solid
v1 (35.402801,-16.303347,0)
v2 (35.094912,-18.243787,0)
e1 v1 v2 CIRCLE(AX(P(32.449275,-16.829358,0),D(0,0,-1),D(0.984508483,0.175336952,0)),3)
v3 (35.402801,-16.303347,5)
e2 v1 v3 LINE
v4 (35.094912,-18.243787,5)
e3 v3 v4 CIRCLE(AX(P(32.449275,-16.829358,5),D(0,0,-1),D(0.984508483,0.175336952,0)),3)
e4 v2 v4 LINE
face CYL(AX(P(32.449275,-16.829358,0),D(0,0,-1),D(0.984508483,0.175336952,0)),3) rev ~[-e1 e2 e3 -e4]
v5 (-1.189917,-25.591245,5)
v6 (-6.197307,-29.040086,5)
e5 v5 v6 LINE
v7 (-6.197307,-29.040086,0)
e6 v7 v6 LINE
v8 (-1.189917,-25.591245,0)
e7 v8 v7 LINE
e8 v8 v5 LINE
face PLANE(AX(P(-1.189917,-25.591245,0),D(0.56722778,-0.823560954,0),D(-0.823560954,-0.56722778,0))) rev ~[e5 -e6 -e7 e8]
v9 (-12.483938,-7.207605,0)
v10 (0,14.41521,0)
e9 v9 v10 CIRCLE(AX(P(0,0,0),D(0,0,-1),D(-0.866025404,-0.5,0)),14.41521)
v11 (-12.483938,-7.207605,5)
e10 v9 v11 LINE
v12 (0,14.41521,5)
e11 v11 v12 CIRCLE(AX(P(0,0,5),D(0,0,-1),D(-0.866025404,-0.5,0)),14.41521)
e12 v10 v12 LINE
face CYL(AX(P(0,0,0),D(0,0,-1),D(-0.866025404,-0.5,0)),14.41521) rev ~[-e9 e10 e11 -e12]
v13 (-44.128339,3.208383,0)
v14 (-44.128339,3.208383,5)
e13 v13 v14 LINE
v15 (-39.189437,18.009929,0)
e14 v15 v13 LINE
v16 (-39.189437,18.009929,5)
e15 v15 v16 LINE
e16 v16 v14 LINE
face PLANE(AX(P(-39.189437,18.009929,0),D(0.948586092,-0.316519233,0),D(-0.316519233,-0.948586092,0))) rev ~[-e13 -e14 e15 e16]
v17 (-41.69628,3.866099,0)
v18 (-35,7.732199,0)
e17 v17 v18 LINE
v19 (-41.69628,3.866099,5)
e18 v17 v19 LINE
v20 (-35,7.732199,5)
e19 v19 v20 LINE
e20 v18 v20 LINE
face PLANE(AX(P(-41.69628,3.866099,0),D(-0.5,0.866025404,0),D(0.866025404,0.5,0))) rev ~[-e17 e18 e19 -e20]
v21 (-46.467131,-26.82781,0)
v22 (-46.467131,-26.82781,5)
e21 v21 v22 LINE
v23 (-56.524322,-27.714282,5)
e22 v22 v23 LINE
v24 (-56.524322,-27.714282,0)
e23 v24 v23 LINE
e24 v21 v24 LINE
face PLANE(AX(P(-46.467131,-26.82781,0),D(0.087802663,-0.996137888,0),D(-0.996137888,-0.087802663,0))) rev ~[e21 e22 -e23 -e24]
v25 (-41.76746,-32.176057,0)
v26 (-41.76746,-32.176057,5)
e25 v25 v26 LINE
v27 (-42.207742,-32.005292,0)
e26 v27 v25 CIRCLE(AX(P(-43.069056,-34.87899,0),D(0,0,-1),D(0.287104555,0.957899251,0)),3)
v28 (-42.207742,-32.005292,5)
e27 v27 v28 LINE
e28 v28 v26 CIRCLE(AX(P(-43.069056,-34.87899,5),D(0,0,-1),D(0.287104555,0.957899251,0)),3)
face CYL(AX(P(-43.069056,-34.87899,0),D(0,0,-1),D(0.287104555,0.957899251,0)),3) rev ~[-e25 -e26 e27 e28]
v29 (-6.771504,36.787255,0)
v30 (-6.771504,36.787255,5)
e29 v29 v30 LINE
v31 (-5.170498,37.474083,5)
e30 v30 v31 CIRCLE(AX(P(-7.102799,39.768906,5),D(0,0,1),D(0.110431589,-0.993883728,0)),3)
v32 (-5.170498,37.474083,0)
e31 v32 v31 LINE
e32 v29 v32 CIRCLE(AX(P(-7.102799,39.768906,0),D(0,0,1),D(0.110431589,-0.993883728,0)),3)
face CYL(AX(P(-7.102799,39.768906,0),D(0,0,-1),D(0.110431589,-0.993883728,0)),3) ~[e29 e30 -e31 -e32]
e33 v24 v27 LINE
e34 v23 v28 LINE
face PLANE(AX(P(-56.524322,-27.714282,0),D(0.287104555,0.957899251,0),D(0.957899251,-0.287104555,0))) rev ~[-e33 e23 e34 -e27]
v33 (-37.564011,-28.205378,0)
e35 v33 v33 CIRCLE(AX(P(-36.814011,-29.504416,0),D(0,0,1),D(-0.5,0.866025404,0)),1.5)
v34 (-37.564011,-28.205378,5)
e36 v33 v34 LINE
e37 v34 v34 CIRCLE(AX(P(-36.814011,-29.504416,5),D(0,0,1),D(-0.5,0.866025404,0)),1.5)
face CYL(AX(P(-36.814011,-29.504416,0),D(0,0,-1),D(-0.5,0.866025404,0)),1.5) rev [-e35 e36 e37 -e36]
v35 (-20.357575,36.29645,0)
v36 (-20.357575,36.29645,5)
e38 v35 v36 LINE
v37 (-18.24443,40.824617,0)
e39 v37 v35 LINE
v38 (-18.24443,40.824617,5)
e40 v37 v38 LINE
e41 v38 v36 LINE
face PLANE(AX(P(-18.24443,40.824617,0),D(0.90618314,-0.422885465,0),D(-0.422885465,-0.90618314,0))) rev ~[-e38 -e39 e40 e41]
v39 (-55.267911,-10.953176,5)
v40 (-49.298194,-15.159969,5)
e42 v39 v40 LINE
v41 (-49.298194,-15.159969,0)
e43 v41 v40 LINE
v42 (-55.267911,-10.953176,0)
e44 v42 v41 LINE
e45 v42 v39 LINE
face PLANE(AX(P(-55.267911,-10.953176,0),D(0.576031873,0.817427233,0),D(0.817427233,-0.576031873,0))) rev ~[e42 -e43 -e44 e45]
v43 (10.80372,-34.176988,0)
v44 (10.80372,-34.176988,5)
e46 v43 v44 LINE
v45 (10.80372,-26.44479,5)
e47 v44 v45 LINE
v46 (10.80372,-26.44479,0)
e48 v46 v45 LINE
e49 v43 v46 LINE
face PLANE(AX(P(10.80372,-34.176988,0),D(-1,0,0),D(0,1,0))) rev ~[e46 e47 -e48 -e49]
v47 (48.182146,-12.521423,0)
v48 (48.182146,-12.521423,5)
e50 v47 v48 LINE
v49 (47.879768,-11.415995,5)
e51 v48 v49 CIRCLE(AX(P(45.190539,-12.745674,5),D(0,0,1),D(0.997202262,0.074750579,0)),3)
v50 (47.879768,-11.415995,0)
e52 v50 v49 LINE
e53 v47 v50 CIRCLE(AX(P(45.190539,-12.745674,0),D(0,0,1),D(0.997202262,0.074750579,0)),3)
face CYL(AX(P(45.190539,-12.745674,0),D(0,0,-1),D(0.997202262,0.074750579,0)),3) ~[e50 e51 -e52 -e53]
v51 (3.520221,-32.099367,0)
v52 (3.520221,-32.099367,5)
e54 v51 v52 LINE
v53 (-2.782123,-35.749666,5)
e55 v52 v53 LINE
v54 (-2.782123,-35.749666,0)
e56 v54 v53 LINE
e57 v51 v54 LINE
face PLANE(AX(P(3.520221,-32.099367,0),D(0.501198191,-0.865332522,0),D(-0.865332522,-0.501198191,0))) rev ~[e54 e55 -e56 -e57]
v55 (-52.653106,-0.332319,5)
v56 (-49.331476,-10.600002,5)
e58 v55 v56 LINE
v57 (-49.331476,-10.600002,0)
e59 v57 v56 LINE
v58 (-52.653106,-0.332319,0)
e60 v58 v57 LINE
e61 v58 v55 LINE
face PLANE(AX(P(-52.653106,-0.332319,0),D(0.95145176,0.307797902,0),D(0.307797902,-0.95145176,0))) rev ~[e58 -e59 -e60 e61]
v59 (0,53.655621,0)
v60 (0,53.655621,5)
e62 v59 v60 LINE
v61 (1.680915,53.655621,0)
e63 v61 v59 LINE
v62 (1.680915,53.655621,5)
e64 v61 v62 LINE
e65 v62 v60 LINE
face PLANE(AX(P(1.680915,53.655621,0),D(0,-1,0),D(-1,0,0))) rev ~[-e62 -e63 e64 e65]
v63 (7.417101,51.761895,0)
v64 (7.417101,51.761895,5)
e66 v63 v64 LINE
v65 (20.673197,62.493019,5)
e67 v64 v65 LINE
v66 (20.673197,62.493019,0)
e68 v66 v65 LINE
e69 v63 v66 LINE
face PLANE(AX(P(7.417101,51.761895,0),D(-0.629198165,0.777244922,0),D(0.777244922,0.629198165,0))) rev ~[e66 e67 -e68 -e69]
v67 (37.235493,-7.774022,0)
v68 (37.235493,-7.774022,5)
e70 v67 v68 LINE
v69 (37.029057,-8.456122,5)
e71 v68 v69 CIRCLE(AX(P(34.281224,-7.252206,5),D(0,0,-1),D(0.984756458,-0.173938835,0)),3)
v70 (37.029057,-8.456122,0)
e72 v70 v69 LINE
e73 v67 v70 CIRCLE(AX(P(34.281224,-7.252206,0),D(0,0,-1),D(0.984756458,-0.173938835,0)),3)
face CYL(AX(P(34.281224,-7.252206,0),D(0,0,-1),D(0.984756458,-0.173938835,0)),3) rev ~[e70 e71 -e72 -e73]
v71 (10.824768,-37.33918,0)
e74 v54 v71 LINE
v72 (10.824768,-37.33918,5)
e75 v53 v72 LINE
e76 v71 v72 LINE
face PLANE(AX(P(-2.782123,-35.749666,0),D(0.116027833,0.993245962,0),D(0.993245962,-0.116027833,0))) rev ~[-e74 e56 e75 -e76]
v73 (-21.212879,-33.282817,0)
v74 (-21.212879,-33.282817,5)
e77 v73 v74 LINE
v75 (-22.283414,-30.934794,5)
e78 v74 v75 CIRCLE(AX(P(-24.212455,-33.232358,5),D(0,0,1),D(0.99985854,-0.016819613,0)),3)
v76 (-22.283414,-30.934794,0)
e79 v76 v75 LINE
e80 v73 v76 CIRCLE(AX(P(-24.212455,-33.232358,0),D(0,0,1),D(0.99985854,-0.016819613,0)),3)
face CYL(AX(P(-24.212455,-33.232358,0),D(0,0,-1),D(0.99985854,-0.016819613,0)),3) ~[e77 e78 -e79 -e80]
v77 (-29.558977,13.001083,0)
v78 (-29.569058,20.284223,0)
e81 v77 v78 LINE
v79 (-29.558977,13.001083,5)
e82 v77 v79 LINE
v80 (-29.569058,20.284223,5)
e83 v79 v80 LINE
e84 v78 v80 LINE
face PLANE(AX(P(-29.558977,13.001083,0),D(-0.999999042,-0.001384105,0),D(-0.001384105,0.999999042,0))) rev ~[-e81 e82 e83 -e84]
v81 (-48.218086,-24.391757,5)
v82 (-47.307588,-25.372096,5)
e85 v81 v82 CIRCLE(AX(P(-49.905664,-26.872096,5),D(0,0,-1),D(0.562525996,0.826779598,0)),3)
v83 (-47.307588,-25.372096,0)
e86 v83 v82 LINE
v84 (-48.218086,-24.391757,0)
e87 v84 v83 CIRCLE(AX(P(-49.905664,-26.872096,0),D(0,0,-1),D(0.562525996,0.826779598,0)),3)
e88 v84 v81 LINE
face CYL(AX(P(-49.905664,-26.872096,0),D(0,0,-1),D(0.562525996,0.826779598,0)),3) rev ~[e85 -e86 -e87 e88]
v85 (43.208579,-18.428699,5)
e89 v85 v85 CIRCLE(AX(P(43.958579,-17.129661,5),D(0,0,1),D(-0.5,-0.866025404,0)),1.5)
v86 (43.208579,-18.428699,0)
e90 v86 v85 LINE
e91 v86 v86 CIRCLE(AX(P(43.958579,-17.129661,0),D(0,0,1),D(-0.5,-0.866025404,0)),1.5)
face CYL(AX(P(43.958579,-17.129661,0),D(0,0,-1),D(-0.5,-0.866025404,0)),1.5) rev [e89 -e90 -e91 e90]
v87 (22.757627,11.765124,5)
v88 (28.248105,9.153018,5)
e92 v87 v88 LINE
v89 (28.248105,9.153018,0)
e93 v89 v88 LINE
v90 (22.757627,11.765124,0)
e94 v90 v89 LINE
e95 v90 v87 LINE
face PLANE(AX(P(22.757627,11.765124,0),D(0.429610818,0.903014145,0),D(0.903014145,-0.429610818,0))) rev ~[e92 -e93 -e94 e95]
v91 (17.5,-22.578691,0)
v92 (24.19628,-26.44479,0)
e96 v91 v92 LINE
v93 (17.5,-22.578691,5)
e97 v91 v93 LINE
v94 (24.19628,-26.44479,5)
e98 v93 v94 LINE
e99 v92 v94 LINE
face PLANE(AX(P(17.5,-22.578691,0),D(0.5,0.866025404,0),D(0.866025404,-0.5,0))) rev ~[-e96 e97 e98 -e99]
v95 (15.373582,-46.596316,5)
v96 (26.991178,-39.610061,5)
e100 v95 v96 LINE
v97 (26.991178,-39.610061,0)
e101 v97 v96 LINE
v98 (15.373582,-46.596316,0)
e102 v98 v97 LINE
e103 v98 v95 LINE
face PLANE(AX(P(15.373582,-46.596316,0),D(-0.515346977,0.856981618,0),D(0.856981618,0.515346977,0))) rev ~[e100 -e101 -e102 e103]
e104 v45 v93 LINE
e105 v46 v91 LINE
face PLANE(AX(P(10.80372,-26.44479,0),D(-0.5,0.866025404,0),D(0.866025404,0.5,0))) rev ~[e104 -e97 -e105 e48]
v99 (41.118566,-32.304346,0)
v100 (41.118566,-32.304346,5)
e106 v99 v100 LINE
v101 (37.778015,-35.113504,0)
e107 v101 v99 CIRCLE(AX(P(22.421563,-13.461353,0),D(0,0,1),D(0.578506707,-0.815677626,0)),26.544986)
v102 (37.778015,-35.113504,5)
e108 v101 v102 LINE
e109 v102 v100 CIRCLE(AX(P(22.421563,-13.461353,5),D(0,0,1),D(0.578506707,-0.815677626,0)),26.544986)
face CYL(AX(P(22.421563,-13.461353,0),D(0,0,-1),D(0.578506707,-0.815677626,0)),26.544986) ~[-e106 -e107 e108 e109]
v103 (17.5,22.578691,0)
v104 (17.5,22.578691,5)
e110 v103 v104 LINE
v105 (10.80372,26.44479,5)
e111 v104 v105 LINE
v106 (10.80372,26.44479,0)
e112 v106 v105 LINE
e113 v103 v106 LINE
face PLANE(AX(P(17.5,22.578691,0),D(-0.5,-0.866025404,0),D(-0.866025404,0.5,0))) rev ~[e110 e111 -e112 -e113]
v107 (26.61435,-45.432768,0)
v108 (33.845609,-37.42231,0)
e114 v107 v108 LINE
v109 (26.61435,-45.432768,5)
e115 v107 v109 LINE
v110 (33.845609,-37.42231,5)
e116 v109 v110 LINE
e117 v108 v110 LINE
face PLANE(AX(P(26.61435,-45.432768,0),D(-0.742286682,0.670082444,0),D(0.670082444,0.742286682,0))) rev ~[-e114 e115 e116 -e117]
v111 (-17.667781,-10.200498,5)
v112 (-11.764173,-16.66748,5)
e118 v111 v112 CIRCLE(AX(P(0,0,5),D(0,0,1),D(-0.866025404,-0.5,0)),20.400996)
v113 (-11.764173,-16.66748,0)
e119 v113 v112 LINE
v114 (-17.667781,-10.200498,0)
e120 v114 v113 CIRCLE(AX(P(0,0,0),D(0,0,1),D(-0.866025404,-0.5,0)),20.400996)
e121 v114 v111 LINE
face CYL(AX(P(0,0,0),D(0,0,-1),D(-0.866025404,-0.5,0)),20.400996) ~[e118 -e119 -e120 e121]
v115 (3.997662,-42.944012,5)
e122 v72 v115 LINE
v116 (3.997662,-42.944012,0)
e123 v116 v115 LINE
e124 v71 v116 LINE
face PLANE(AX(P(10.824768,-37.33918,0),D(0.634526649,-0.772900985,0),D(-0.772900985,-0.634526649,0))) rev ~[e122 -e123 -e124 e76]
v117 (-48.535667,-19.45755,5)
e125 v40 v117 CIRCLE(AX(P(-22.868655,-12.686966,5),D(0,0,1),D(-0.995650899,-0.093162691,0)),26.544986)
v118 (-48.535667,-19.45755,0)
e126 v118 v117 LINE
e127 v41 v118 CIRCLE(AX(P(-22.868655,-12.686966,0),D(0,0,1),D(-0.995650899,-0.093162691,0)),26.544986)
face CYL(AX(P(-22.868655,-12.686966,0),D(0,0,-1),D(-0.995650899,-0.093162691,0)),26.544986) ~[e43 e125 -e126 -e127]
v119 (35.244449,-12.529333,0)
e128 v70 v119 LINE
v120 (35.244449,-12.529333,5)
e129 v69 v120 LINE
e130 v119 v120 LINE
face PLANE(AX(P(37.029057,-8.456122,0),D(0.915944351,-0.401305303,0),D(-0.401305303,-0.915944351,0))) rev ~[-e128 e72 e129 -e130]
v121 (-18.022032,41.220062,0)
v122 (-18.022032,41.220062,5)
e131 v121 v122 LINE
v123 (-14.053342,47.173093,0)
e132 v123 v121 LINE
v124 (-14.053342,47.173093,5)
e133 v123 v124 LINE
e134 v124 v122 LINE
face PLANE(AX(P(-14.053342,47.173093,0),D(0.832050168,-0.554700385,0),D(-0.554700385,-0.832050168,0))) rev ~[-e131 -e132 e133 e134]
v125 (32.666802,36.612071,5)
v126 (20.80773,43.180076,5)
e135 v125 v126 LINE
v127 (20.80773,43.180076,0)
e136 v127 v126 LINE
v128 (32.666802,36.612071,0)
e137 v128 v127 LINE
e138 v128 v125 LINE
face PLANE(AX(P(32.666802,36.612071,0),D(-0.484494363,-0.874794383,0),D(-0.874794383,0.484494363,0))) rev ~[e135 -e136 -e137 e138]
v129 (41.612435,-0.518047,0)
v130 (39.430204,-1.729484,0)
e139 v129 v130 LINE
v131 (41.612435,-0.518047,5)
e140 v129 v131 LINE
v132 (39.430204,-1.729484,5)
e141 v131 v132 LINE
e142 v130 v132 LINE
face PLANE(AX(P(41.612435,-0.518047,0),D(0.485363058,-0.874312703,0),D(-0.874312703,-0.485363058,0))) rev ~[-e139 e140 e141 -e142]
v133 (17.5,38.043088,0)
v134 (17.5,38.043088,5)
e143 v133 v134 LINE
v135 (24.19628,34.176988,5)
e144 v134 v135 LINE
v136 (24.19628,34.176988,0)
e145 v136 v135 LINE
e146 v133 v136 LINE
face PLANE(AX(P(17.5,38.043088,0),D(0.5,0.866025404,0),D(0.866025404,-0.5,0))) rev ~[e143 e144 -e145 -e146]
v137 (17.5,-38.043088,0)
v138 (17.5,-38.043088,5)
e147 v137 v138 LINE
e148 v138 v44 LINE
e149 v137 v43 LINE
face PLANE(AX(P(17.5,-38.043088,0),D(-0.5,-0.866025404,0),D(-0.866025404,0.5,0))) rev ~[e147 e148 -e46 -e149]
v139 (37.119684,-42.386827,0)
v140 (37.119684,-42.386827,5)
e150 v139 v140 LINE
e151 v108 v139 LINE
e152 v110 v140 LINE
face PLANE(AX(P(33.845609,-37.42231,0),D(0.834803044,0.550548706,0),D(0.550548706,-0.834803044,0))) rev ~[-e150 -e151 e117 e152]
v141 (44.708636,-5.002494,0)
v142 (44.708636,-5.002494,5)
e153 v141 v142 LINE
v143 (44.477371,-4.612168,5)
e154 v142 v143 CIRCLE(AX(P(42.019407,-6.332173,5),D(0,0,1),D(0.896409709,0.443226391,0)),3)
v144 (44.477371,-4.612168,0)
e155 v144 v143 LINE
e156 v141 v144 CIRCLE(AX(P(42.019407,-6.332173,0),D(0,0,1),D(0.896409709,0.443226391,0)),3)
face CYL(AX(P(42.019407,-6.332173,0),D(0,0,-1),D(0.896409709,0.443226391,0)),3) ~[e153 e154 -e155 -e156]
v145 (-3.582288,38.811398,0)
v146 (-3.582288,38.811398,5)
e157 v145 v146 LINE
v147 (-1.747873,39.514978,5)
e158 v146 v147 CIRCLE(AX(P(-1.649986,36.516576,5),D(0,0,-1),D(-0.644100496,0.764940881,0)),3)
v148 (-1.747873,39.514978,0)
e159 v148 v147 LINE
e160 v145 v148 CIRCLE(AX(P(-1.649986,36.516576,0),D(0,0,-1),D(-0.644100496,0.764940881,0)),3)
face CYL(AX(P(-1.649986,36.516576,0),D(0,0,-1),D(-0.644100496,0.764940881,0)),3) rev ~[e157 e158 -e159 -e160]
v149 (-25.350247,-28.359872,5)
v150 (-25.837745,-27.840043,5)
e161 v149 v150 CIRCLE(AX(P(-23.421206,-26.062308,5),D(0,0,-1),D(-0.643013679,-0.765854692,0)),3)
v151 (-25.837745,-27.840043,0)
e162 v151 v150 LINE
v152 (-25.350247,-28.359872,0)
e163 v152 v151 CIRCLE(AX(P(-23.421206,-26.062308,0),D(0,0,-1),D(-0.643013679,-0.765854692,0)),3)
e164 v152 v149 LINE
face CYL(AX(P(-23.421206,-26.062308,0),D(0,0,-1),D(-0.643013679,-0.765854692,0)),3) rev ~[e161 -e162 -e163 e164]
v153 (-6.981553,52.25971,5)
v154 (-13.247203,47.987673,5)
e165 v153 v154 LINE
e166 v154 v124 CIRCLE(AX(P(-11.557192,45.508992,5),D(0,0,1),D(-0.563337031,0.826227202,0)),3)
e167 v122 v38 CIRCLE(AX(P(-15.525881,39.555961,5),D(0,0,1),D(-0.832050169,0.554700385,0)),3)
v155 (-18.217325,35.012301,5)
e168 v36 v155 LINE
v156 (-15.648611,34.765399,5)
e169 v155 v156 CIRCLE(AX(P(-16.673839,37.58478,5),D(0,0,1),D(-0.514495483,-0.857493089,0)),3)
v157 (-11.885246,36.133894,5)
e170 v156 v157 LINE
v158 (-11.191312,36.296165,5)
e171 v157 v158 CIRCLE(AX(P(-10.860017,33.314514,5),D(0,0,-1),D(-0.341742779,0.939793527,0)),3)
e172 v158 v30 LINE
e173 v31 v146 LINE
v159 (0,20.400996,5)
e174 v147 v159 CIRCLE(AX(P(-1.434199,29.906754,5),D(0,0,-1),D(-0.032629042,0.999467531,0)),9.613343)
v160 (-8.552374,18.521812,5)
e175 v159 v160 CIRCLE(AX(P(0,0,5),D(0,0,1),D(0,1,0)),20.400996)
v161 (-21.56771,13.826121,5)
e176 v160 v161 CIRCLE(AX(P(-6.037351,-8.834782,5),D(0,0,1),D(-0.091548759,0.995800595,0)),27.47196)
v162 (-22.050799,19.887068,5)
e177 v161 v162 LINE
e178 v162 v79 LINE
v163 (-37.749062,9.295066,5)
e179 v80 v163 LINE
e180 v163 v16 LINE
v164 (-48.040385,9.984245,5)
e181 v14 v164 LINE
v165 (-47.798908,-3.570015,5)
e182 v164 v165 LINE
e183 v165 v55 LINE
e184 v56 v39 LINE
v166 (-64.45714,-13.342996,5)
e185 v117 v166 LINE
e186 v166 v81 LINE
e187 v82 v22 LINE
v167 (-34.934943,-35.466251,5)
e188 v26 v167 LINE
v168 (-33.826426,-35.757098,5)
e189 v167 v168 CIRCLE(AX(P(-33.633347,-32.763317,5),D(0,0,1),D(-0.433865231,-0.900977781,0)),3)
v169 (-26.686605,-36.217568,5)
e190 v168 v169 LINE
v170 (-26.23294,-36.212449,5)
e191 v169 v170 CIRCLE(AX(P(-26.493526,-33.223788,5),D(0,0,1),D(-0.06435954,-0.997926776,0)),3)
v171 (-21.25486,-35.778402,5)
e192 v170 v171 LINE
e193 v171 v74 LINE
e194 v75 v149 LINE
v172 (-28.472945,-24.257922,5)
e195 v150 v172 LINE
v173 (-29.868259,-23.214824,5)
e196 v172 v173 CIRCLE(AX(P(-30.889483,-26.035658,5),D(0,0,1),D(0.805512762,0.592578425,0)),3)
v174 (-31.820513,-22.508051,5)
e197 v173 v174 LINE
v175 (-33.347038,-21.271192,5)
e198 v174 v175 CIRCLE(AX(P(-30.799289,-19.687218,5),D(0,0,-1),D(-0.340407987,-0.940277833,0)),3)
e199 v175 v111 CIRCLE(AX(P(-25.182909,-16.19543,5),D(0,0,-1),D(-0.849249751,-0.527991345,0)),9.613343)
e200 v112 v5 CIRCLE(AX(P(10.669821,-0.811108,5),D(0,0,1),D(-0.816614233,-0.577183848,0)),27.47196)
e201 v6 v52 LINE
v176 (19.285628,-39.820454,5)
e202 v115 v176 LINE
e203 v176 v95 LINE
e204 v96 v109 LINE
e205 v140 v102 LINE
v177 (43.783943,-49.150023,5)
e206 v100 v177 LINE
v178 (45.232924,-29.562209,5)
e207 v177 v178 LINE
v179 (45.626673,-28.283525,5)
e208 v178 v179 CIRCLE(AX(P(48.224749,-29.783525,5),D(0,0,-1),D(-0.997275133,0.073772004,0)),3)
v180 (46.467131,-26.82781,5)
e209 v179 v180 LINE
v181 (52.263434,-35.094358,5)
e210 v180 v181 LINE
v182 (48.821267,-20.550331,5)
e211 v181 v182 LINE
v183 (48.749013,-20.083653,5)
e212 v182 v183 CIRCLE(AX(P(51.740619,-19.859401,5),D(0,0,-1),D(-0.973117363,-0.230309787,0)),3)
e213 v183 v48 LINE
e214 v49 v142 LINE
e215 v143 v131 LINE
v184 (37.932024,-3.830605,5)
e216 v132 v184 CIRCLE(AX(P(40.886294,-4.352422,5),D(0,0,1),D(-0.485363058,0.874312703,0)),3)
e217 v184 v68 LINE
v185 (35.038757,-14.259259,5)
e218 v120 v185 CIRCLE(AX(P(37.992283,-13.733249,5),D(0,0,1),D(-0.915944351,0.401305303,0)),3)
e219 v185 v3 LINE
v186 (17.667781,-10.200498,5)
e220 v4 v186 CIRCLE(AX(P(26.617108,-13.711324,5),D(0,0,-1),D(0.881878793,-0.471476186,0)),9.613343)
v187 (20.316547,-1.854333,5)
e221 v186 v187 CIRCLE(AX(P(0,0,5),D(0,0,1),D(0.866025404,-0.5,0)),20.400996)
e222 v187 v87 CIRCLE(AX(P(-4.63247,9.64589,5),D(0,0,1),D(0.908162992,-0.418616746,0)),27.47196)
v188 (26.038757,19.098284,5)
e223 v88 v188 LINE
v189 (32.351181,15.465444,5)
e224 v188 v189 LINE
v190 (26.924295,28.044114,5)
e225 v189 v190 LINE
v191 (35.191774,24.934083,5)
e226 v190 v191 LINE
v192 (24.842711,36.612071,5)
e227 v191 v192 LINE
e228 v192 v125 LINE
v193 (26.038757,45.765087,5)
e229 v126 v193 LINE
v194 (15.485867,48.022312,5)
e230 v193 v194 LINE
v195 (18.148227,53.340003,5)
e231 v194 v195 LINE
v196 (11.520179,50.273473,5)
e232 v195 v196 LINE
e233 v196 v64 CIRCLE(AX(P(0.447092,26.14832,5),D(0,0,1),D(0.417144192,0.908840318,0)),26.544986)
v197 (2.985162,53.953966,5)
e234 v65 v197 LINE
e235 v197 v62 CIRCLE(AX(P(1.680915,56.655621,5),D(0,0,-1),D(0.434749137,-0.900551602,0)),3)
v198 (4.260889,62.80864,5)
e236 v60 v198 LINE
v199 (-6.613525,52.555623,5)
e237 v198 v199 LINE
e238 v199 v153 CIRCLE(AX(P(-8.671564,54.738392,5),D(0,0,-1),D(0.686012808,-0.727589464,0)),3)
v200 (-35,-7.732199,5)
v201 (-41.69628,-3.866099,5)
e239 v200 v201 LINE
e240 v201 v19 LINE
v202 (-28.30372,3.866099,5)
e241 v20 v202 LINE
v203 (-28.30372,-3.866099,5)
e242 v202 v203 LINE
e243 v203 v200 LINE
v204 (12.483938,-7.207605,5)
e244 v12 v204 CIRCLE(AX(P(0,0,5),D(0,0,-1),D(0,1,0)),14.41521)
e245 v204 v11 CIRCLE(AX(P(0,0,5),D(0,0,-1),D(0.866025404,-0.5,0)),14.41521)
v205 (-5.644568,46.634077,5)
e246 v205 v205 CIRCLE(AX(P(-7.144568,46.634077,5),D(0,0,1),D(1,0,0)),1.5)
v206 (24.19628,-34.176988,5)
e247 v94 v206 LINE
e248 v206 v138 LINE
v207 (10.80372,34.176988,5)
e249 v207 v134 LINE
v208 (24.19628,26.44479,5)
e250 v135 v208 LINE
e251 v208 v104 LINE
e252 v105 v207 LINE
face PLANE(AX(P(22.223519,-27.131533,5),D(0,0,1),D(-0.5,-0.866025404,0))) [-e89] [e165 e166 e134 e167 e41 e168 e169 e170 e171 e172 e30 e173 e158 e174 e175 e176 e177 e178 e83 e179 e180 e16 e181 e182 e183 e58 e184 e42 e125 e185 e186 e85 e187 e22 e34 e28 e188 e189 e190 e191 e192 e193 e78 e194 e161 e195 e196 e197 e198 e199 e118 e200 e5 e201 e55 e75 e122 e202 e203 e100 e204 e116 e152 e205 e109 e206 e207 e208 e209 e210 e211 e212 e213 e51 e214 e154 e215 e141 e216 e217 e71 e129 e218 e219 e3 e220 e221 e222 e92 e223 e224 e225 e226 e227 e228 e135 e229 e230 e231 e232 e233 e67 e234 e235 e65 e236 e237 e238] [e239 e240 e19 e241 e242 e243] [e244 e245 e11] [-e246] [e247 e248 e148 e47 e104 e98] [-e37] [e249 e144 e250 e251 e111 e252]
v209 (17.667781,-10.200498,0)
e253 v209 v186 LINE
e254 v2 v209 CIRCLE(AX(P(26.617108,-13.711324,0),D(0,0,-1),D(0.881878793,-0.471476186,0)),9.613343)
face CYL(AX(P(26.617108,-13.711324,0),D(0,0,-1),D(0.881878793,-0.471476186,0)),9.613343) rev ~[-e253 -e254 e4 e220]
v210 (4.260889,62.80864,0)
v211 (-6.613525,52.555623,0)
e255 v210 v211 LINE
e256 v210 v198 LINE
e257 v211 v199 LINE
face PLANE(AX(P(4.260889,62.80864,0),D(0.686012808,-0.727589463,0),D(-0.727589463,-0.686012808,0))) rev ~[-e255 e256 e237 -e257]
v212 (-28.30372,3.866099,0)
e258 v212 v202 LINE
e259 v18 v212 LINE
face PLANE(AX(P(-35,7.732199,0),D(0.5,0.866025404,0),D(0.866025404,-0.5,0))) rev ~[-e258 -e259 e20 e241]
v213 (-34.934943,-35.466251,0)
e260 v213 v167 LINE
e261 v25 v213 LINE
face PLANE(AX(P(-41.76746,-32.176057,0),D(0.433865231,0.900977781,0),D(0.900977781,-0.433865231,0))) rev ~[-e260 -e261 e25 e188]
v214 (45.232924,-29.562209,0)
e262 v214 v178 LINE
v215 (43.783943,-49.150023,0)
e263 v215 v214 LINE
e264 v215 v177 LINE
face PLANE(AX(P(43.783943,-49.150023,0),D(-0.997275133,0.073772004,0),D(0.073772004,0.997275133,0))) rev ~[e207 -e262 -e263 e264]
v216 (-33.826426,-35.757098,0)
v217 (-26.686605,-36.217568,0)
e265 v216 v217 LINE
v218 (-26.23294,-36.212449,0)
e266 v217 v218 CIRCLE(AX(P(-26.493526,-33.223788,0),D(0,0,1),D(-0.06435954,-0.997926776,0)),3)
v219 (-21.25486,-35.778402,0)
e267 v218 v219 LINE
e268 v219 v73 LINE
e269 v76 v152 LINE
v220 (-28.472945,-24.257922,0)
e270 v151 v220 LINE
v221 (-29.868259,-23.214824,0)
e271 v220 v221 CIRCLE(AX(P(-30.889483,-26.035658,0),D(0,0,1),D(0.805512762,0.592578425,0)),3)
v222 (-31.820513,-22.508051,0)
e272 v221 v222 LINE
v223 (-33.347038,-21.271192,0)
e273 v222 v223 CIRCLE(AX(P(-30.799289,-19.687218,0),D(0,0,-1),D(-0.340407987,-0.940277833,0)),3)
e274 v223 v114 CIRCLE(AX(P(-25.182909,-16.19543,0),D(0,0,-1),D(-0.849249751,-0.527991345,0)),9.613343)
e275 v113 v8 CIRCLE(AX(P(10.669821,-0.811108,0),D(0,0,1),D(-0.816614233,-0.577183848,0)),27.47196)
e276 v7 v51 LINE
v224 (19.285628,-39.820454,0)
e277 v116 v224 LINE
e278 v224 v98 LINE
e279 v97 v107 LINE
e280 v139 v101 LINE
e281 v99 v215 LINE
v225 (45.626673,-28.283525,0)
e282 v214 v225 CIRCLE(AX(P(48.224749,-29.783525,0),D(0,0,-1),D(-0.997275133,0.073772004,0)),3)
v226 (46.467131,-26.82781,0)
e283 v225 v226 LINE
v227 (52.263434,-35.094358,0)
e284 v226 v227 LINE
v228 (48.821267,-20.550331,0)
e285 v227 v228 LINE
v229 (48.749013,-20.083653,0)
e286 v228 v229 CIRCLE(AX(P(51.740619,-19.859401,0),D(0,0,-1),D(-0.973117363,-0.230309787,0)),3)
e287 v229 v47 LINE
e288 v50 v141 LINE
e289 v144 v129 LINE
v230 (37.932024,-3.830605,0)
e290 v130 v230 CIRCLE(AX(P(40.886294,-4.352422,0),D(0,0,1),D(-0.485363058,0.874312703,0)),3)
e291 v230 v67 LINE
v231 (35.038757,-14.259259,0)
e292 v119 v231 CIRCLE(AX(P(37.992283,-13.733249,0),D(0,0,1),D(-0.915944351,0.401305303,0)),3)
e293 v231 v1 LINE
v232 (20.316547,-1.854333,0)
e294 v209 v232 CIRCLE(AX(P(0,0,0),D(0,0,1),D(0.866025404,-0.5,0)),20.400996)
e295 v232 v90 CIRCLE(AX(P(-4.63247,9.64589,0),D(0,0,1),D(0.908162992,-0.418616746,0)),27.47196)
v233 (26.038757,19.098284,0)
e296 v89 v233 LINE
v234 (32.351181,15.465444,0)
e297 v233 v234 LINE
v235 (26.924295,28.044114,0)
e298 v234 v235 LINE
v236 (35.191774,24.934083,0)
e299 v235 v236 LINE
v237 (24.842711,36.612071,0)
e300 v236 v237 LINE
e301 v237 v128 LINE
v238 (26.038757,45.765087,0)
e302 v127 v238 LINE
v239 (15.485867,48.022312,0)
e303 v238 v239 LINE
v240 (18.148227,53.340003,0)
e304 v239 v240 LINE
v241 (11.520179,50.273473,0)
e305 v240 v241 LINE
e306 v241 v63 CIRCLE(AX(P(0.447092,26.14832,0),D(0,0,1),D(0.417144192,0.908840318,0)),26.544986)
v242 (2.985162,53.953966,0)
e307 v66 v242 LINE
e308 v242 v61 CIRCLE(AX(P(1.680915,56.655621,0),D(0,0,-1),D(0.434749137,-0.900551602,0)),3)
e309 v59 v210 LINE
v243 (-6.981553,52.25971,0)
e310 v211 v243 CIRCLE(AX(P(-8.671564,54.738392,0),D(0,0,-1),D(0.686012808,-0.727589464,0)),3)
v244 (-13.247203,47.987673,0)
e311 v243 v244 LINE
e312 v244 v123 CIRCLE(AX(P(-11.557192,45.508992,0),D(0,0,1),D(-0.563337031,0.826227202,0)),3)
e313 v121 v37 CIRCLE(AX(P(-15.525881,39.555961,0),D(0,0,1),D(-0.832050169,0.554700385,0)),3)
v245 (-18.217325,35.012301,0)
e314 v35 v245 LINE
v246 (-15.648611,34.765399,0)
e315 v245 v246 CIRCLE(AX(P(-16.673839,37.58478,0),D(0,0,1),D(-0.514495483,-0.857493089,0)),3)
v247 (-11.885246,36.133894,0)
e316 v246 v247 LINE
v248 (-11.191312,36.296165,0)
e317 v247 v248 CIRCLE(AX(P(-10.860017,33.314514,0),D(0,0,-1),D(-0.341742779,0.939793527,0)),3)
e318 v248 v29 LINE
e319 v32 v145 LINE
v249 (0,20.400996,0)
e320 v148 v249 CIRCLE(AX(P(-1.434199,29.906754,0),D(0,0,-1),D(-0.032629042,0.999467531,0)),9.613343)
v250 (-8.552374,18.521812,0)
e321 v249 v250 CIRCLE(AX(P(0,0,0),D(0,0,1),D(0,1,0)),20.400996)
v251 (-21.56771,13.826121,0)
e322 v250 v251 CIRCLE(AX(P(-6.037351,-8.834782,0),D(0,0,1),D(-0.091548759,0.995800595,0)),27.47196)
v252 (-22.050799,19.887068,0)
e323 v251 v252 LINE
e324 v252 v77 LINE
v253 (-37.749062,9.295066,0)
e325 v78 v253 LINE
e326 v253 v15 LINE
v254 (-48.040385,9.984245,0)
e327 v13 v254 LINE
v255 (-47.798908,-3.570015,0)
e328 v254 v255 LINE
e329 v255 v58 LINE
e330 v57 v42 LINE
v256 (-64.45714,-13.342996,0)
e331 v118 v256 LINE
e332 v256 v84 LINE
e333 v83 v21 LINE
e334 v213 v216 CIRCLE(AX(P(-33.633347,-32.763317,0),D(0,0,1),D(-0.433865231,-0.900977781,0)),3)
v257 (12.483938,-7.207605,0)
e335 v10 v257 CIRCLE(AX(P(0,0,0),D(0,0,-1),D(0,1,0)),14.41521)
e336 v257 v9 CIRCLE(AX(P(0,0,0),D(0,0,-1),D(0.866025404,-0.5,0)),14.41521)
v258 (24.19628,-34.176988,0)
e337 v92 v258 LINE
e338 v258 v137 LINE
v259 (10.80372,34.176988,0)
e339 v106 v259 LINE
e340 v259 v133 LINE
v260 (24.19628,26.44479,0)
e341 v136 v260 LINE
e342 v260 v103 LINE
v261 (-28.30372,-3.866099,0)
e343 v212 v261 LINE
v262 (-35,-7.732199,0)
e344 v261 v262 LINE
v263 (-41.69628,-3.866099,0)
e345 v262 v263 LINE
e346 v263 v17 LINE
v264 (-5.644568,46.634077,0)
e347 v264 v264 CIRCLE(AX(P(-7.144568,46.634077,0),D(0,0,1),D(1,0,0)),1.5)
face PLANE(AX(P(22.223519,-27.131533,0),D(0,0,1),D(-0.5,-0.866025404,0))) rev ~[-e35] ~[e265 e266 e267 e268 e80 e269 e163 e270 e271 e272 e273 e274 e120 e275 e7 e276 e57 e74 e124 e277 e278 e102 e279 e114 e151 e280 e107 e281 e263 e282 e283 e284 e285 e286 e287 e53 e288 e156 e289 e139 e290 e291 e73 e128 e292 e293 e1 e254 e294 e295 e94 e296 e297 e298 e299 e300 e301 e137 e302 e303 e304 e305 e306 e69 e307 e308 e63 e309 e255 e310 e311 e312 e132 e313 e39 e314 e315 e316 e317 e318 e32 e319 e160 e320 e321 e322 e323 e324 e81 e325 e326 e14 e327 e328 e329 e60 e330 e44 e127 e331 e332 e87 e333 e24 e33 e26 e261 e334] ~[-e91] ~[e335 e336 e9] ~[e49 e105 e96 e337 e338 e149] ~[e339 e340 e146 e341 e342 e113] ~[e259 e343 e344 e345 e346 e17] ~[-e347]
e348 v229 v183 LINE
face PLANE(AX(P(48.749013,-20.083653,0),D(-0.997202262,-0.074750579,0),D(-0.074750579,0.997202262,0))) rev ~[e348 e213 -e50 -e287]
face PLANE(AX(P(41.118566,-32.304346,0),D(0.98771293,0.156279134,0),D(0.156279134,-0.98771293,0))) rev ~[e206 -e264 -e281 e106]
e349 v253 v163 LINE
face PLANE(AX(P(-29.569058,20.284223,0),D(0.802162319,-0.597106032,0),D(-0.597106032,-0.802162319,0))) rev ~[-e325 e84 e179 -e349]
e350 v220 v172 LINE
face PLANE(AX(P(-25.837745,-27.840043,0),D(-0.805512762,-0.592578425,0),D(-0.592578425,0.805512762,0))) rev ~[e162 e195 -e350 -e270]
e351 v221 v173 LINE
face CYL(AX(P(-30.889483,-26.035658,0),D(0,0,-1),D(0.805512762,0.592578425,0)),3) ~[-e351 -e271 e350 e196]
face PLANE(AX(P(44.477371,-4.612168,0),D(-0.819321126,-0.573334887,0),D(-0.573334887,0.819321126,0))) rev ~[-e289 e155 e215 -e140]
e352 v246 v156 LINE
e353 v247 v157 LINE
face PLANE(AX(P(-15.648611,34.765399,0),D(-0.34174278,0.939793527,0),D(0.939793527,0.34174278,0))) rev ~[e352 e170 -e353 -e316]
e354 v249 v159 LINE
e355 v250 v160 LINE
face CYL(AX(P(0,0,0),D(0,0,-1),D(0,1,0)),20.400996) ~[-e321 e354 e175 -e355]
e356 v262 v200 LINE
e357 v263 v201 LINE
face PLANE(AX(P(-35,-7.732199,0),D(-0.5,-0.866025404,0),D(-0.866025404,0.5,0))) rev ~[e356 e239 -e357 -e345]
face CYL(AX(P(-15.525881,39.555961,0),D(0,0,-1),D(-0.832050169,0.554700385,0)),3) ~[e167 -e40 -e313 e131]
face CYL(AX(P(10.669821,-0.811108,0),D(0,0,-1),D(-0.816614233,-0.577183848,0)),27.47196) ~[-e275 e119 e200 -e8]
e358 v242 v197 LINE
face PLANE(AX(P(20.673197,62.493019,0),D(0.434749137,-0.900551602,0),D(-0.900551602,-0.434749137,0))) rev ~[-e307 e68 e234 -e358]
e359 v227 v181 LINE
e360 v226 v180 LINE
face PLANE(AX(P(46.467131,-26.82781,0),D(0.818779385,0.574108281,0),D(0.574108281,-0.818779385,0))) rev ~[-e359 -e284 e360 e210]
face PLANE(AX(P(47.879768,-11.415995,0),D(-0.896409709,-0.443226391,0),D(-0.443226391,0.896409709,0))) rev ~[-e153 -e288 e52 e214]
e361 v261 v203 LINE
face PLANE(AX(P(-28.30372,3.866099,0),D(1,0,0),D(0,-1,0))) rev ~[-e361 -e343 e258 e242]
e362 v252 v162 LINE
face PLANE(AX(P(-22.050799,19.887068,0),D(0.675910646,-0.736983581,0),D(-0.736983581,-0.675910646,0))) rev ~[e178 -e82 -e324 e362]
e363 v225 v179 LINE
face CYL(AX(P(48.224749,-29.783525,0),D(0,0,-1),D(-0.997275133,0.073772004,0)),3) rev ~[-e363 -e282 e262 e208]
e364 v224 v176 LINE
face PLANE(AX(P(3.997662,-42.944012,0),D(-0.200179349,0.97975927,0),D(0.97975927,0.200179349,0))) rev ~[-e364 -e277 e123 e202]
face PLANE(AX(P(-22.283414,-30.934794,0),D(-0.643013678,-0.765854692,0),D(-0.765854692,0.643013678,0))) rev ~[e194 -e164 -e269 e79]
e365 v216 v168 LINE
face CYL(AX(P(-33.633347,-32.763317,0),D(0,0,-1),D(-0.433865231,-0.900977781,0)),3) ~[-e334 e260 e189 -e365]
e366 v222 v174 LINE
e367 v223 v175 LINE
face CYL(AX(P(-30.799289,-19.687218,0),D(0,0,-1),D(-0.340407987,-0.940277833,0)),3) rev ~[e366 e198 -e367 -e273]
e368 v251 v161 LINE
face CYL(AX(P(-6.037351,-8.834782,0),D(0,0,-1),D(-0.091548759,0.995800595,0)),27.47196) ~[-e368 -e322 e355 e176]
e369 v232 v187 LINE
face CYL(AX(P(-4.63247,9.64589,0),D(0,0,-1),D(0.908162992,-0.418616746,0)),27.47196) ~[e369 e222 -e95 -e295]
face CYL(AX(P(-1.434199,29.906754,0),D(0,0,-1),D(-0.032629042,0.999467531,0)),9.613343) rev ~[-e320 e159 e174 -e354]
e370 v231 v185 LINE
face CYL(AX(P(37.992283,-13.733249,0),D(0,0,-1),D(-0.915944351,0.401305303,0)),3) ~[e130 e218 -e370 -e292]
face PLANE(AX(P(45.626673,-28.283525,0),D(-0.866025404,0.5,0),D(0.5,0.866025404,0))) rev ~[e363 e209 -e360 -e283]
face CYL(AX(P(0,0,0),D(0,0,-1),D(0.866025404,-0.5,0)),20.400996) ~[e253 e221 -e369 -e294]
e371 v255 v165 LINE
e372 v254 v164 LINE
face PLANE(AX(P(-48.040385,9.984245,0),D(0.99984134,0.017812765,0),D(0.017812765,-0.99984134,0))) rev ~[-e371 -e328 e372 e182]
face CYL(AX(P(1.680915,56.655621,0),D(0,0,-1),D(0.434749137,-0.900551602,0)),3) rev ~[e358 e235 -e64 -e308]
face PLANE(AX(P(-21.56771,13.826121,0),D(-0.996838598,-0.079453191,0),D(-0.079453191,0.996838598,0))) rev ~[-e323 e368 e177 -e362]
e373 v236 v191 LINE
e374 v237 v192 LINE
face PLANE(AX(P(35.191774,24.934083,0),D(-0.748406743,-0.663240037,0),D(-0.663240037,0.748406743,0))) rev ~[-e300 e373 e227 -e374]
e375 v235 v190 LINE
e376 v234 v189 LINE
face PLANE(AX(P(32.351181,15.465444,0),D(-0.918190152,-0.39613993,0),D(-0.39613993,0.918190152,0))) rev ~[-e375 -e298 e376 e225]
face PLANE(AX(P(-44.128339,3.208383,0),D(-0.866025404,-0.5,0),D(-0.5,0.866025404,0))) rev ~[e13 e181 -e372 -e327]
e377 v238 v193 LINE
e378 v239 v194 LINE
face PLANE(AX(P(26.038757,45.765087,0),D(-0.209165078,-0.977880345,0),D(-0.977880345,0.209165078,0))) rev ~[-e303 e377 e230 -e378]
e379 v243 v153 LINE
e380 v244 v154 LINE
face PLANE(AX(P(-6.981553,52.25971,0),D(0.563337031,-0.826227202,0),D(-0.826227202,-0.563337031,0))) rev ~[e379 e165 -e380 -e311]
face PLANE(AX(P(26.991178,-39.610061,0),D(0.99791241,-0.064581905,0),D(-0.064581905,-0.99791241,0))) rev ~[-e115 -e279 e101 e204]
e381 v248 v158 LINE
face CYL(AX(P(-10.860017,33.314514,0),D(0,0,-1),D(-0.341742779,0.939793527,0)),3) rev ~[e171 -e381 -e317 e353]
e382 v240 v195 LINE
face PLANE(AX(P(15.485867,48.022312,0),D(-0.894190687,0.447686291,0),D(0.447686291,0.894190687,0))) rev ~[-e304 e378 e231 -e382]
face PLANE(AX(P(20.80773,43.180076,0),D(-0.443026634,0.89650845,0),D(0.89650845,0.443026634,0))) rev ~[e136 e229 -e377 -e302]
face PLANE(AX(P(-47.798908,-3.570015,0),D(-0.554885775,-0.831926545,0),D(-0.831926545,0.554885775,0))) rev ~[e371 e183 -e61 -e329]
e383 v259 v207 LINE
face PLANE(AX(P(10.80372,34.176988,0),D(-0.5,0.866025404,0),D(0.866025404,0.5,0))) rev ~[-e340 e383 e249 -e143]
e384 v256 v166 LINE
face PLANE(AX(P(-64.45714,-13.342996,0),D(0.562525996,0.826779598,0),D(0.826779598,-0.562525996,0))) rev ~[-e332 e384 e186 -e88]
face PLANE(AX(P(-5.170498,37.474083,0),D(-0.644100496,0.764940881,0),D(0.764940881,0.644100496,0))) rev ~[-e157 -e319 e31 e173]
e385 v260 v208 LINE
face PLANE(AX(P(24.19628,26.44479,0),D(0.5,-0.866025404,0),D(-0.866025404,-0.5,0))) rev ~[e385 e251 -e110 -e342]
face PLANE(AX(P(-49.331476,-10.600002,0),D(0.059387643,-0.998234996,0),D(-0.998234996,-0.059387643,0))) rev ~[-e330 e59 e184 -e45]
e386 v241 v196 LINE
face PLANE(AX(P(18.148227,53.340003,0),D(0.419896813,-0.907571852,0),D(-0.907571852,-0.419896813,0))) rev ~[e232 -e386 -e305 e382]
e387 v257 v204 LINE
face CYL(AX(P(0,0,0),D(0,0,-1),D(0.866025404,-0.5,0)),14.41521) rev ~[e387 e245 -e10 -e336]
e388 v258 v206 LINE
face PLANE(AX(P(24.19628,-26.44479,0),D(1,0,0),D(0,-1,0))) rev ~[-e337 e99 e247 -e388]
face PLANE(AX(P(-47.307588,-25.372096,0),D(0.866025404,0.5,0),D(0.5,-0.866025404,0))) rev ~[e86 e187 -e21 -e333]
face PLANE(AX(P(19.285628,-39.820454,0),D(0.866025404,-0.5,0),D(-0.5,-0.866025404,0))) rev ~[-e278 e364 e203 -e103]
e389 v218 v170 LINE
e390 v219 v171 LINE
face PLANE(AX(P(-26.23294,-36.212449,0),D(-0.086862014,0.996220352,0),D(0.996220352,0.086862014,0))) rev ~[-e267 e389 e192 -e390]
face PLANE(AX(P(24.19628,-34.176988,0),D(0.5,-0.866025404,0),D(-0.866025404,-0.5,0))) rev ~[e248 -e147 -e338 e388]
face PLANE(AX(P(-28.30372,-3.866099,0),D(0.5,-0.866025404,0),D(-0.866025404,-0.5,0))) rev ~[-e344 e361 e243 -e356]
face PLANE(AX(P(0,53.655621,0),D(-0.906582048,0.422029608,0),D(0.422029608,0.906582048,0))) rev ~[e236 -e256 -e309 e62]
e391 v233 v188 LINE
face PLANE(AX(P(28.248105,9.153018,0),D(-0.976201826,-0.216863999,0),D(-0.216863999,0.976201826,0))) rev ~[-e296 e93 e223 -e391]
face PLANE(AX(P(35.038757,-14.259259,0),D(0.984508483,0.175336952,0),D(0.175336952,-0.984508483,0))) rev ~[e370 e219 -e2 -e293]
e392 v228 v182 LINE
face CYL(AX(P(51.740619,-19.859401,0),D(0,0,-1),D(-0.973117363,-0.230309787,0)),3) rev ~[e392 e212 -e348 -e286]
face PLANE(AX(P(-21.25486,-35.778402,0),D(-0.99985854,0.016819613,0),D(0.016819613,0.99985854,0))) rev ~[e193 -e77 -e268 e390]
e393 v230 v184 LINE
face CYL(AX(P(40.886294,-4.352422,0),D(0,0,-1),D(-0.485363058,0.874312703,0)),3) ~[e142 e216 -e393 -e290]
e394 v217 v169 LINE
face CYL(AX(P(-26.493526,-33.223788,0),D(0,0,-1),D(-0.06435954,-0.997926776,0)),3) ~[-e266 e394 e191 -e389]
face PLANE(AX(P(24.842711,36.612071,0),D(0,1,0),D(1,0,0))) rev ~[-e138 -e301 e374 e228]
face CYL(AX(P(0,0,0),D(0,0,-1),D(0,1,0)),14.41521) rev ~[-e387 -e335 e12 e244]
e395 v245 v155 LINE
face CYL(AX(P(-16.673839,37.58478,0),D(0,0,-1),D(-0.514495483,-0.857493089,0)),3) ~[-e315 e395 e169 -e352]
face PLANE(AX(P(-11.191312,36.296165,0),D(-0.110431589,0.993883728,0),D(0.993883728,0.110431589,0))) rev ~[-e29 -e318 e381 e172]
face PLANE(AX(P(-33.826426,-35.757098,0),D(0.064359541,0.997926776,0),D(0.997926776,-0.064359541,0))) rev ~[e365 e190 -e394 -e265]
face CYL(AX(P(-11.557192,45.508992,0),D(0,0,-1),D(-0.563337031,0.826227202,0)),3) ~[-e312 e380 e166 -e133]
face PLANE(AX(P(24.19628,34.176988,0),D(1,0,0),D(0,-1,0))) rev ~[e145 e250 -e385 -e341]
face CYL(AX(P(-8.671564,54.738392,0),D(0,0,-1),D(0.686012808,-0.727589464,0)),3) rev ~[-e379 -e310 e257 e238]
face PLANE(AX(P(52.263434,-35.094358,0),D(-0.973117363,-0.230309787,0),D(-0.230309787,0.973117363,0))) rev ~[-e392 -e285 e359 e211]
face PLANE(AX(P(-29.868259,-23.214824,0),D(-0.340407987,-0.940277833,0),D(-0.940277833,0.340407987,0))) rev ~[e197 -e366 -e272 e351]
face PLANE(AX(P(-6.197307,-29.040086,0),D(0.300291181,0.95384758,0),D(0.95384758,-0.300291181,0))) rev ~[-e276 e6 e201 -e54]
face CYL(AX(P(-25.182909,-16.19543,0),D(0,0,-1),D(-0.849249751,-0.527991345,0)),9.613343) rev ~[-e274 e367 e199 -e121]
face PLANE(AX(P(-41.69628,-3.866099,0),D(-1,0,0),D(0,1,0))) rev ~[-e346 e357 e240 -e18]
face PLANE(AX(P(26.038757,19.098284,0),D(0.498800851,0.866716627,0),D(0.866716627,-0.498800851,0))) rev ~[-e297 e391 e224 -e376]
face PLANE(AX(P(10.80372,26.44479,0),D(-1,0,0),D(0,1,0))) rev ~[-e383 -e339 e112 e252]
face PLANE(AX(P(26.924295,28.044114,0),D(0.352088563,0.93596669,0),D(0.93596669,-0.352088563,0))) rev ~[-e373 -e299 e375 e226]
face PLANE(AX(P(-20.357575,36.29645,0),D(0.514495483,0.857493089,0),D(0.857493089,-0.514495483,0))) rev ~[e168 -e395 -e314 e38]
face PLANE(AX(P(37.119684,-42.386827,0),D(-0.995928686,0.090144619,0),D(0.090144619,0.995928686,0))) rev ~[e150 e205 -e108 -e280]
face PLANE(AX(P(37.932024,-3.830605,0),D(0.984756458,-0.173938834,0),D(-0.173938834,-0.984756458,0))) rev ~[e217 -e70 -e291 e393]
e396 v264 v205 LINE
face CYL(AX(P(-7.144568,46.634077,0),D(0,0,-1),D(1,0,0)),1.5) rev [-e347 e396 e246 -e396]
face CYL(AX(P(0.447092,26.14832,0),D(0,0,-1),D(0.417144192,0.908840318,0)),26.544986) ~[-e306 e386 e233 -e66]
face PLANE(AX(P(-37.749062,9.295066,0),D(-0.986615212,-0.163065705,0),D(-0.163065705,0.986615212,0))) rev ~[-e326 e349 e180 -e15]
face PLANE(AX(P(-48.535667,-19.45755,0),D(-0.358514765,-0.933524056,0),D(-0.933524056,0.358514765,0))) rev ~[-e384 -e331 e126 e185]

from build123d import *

# Parameters (mm, degrees)
F0_R     = 1.5
F1_DEPTH = 5
F3_COUNT = 3


# Not quite as in the source:
# - a feature names something its author has since deleted; it is built from what else it names


with BuildPart() as f1:
    # F0 (on Top) → F1 (new body)
    with BuildSketch(Plane.XY):
        with BuildLine():
            ThreePointArc((-1.7478732612, 39.5149783142), (8.1392001596, 30.7821912097), (0, 20.4009960858))
            Line((0, 20.4009960858), (0, 14.4152096754))
            ThreePointArc((0, 14.4152096754), (12.4839377798, 7.2076048377), (12.4839377798, -7.2076048377))
            Line((12.4839377798, -7.2076048377), (17.6677808728, -10.2004980429))
            ThreePointArc((17.6677808728, -10.2004980429), (19.4452285789, -6.171201407), (20.3165472355, -1.8543326892))
            ThreePointArc((20.3165472355, -1.8543326892), (22.4085751719, 4.7991946551), (22.7576271971, 11.7651238603))
            Line((22.7576271971, 11.7651238603), (28.2481051981, 9.1530177742))
            Line((28.2481051981, 9.1530177742), (26.0387565941, 19.0982837094))
            Line((26.0387565941, 19.0982837094), (32.3511809111, 15.4654439539))
            Line((32.3511809111, 15.4654439539), (26.9242947963, 28.0441137764))
            Line((26.9242947963, 28.0441137764), (35.1917743683, 24.9340832233))
            Line((35.1917743683, 24.9340832233), (24.8427105993, 36.6120710969))
            Line((24.8427105993, 36.6120710969), (32.6668024063, 36.6120710969))
            Line((32.6668024063, 36.6120710969), (20.8077298225, 43.1800760308))
            Line((20.8077298225, 43.1800760308), (26.0387565941, 45.7650870085))
            Line((26.0387565941, 45.7650870085), (15.485866915, 48.02231204))
            Line((15.485866915, 48.02231204), (18.1482266635, 53.3400028944))
            Line((18.1482266635, 53.3400028944), (11.520179105, 50.2734731867))
            ThreePointArc((11.520179105, 50.2734731867), (9.4992839441, 51.1021592503), (7.4171009474, 51.7618954182))
            Line((7.4171009474, 51.7618954182), (20.6731967628, 62.493018806))
            Line((20.6731967628, 62.493018806), (2.9851620813, 53.9539658583))
            ThreePointArc((2.9851620813, 53.9539658583), (2.3498823759, 53.7311579429), (1.6809146705, 53.6556206644))
            Line((1.6809146705, 53.6556206644), (0, 53.6556206644))
            Line((0, 53.6556206644), (4.2608887888, 62.8086403012))
            Line((4.2608887888, 62.8086403012), (-6.6135251858, 52.5556231266))
            ThreePointArc((-6.6135251858, 52.5556231266), (-6.7917072446, 52.4004137483), (-6.9815525166, 52.2597099106))
            Line((-6.9815525166, 52.2597099106), (-13.2472028108, 47.9876733272))
            ThreePointArc((-13.2472028108, 47.9876733272), (-13.6895314092, 47.6192351761), (-14.0533422232, 47.1730928761))
            Line((-14.0533422232, 47.1730928761), (-18.0220315222, 41.2200618552))
            ThreePointArc((-18.0220315222, 41.2200618552), (-18.1407171431, 41.0265497088), (-18.2444304369, 40.824617096))
            Line((-18.2444304369, 40.824617096), (-20.3575752676, 36.2964496017))
            Line((-20.3575752676, 36.2964496017), (-18.2173253559, 35.0123005809))
            ThreePointArc((-18.2173253559, 35.0123005809), (-16.9608718875, 34.5985427406), (-15.6486105692, 34.7653992696))
            Line((-15.6486105692, 34.7653992696), (-11.8852458251, 36.1338942554))
            ThreePointArc((-11.8852458251, 36.1338942554), (-11.5431146027, 36.2357083507), (-11.1913122519, 36.2961648589))
            Line((-11.1913122519, 36.2961648589), (-6.7715043443, 36.7872549082))
            ThreePointArc((-6.7715043443, 36.7872549082), (-5.920047927, 37.0118969078), (-5.1704976221, 37.4740834492))
            Line((-5.1704976221, 37.4740834492), (-3.5822876233, 38.8113983631))
            ThreePointArc((-3.5822876233, 38.8113983631), (-2.7243104061, 39.3176161279), (-1.7478732612, 39.5149783142))
        make_face()
        with Locations((-7.1445683185, 46.6340765733)):
            Circle(F0_R, mode=Mode.SUBTRACT)
        Polygon((10.8037195943, 34.1769884273), (17.5, 38.0430877221), (24.1962804057, 34.1769884273), (24.1962804057, 26.4447898377), (17.5, 22.5786905429), (10.8037195943, 26.4447898377), align=None, mode=Mode.SUBTRACT)
    extrude(amount=F1_DEPTH)

    # F3: F1 ×3 about axis
    f3_axis = Axis((0, 0, 21.8280367553), (0, 0, 1))


with BuildPart() as f1_1:
    add(f1.part)
    for i in range(1, F3_COUNT):
        add(f1.part.rotate(f3_axis, i * 360 / F3_COUNT))


solid = f1_1.part
